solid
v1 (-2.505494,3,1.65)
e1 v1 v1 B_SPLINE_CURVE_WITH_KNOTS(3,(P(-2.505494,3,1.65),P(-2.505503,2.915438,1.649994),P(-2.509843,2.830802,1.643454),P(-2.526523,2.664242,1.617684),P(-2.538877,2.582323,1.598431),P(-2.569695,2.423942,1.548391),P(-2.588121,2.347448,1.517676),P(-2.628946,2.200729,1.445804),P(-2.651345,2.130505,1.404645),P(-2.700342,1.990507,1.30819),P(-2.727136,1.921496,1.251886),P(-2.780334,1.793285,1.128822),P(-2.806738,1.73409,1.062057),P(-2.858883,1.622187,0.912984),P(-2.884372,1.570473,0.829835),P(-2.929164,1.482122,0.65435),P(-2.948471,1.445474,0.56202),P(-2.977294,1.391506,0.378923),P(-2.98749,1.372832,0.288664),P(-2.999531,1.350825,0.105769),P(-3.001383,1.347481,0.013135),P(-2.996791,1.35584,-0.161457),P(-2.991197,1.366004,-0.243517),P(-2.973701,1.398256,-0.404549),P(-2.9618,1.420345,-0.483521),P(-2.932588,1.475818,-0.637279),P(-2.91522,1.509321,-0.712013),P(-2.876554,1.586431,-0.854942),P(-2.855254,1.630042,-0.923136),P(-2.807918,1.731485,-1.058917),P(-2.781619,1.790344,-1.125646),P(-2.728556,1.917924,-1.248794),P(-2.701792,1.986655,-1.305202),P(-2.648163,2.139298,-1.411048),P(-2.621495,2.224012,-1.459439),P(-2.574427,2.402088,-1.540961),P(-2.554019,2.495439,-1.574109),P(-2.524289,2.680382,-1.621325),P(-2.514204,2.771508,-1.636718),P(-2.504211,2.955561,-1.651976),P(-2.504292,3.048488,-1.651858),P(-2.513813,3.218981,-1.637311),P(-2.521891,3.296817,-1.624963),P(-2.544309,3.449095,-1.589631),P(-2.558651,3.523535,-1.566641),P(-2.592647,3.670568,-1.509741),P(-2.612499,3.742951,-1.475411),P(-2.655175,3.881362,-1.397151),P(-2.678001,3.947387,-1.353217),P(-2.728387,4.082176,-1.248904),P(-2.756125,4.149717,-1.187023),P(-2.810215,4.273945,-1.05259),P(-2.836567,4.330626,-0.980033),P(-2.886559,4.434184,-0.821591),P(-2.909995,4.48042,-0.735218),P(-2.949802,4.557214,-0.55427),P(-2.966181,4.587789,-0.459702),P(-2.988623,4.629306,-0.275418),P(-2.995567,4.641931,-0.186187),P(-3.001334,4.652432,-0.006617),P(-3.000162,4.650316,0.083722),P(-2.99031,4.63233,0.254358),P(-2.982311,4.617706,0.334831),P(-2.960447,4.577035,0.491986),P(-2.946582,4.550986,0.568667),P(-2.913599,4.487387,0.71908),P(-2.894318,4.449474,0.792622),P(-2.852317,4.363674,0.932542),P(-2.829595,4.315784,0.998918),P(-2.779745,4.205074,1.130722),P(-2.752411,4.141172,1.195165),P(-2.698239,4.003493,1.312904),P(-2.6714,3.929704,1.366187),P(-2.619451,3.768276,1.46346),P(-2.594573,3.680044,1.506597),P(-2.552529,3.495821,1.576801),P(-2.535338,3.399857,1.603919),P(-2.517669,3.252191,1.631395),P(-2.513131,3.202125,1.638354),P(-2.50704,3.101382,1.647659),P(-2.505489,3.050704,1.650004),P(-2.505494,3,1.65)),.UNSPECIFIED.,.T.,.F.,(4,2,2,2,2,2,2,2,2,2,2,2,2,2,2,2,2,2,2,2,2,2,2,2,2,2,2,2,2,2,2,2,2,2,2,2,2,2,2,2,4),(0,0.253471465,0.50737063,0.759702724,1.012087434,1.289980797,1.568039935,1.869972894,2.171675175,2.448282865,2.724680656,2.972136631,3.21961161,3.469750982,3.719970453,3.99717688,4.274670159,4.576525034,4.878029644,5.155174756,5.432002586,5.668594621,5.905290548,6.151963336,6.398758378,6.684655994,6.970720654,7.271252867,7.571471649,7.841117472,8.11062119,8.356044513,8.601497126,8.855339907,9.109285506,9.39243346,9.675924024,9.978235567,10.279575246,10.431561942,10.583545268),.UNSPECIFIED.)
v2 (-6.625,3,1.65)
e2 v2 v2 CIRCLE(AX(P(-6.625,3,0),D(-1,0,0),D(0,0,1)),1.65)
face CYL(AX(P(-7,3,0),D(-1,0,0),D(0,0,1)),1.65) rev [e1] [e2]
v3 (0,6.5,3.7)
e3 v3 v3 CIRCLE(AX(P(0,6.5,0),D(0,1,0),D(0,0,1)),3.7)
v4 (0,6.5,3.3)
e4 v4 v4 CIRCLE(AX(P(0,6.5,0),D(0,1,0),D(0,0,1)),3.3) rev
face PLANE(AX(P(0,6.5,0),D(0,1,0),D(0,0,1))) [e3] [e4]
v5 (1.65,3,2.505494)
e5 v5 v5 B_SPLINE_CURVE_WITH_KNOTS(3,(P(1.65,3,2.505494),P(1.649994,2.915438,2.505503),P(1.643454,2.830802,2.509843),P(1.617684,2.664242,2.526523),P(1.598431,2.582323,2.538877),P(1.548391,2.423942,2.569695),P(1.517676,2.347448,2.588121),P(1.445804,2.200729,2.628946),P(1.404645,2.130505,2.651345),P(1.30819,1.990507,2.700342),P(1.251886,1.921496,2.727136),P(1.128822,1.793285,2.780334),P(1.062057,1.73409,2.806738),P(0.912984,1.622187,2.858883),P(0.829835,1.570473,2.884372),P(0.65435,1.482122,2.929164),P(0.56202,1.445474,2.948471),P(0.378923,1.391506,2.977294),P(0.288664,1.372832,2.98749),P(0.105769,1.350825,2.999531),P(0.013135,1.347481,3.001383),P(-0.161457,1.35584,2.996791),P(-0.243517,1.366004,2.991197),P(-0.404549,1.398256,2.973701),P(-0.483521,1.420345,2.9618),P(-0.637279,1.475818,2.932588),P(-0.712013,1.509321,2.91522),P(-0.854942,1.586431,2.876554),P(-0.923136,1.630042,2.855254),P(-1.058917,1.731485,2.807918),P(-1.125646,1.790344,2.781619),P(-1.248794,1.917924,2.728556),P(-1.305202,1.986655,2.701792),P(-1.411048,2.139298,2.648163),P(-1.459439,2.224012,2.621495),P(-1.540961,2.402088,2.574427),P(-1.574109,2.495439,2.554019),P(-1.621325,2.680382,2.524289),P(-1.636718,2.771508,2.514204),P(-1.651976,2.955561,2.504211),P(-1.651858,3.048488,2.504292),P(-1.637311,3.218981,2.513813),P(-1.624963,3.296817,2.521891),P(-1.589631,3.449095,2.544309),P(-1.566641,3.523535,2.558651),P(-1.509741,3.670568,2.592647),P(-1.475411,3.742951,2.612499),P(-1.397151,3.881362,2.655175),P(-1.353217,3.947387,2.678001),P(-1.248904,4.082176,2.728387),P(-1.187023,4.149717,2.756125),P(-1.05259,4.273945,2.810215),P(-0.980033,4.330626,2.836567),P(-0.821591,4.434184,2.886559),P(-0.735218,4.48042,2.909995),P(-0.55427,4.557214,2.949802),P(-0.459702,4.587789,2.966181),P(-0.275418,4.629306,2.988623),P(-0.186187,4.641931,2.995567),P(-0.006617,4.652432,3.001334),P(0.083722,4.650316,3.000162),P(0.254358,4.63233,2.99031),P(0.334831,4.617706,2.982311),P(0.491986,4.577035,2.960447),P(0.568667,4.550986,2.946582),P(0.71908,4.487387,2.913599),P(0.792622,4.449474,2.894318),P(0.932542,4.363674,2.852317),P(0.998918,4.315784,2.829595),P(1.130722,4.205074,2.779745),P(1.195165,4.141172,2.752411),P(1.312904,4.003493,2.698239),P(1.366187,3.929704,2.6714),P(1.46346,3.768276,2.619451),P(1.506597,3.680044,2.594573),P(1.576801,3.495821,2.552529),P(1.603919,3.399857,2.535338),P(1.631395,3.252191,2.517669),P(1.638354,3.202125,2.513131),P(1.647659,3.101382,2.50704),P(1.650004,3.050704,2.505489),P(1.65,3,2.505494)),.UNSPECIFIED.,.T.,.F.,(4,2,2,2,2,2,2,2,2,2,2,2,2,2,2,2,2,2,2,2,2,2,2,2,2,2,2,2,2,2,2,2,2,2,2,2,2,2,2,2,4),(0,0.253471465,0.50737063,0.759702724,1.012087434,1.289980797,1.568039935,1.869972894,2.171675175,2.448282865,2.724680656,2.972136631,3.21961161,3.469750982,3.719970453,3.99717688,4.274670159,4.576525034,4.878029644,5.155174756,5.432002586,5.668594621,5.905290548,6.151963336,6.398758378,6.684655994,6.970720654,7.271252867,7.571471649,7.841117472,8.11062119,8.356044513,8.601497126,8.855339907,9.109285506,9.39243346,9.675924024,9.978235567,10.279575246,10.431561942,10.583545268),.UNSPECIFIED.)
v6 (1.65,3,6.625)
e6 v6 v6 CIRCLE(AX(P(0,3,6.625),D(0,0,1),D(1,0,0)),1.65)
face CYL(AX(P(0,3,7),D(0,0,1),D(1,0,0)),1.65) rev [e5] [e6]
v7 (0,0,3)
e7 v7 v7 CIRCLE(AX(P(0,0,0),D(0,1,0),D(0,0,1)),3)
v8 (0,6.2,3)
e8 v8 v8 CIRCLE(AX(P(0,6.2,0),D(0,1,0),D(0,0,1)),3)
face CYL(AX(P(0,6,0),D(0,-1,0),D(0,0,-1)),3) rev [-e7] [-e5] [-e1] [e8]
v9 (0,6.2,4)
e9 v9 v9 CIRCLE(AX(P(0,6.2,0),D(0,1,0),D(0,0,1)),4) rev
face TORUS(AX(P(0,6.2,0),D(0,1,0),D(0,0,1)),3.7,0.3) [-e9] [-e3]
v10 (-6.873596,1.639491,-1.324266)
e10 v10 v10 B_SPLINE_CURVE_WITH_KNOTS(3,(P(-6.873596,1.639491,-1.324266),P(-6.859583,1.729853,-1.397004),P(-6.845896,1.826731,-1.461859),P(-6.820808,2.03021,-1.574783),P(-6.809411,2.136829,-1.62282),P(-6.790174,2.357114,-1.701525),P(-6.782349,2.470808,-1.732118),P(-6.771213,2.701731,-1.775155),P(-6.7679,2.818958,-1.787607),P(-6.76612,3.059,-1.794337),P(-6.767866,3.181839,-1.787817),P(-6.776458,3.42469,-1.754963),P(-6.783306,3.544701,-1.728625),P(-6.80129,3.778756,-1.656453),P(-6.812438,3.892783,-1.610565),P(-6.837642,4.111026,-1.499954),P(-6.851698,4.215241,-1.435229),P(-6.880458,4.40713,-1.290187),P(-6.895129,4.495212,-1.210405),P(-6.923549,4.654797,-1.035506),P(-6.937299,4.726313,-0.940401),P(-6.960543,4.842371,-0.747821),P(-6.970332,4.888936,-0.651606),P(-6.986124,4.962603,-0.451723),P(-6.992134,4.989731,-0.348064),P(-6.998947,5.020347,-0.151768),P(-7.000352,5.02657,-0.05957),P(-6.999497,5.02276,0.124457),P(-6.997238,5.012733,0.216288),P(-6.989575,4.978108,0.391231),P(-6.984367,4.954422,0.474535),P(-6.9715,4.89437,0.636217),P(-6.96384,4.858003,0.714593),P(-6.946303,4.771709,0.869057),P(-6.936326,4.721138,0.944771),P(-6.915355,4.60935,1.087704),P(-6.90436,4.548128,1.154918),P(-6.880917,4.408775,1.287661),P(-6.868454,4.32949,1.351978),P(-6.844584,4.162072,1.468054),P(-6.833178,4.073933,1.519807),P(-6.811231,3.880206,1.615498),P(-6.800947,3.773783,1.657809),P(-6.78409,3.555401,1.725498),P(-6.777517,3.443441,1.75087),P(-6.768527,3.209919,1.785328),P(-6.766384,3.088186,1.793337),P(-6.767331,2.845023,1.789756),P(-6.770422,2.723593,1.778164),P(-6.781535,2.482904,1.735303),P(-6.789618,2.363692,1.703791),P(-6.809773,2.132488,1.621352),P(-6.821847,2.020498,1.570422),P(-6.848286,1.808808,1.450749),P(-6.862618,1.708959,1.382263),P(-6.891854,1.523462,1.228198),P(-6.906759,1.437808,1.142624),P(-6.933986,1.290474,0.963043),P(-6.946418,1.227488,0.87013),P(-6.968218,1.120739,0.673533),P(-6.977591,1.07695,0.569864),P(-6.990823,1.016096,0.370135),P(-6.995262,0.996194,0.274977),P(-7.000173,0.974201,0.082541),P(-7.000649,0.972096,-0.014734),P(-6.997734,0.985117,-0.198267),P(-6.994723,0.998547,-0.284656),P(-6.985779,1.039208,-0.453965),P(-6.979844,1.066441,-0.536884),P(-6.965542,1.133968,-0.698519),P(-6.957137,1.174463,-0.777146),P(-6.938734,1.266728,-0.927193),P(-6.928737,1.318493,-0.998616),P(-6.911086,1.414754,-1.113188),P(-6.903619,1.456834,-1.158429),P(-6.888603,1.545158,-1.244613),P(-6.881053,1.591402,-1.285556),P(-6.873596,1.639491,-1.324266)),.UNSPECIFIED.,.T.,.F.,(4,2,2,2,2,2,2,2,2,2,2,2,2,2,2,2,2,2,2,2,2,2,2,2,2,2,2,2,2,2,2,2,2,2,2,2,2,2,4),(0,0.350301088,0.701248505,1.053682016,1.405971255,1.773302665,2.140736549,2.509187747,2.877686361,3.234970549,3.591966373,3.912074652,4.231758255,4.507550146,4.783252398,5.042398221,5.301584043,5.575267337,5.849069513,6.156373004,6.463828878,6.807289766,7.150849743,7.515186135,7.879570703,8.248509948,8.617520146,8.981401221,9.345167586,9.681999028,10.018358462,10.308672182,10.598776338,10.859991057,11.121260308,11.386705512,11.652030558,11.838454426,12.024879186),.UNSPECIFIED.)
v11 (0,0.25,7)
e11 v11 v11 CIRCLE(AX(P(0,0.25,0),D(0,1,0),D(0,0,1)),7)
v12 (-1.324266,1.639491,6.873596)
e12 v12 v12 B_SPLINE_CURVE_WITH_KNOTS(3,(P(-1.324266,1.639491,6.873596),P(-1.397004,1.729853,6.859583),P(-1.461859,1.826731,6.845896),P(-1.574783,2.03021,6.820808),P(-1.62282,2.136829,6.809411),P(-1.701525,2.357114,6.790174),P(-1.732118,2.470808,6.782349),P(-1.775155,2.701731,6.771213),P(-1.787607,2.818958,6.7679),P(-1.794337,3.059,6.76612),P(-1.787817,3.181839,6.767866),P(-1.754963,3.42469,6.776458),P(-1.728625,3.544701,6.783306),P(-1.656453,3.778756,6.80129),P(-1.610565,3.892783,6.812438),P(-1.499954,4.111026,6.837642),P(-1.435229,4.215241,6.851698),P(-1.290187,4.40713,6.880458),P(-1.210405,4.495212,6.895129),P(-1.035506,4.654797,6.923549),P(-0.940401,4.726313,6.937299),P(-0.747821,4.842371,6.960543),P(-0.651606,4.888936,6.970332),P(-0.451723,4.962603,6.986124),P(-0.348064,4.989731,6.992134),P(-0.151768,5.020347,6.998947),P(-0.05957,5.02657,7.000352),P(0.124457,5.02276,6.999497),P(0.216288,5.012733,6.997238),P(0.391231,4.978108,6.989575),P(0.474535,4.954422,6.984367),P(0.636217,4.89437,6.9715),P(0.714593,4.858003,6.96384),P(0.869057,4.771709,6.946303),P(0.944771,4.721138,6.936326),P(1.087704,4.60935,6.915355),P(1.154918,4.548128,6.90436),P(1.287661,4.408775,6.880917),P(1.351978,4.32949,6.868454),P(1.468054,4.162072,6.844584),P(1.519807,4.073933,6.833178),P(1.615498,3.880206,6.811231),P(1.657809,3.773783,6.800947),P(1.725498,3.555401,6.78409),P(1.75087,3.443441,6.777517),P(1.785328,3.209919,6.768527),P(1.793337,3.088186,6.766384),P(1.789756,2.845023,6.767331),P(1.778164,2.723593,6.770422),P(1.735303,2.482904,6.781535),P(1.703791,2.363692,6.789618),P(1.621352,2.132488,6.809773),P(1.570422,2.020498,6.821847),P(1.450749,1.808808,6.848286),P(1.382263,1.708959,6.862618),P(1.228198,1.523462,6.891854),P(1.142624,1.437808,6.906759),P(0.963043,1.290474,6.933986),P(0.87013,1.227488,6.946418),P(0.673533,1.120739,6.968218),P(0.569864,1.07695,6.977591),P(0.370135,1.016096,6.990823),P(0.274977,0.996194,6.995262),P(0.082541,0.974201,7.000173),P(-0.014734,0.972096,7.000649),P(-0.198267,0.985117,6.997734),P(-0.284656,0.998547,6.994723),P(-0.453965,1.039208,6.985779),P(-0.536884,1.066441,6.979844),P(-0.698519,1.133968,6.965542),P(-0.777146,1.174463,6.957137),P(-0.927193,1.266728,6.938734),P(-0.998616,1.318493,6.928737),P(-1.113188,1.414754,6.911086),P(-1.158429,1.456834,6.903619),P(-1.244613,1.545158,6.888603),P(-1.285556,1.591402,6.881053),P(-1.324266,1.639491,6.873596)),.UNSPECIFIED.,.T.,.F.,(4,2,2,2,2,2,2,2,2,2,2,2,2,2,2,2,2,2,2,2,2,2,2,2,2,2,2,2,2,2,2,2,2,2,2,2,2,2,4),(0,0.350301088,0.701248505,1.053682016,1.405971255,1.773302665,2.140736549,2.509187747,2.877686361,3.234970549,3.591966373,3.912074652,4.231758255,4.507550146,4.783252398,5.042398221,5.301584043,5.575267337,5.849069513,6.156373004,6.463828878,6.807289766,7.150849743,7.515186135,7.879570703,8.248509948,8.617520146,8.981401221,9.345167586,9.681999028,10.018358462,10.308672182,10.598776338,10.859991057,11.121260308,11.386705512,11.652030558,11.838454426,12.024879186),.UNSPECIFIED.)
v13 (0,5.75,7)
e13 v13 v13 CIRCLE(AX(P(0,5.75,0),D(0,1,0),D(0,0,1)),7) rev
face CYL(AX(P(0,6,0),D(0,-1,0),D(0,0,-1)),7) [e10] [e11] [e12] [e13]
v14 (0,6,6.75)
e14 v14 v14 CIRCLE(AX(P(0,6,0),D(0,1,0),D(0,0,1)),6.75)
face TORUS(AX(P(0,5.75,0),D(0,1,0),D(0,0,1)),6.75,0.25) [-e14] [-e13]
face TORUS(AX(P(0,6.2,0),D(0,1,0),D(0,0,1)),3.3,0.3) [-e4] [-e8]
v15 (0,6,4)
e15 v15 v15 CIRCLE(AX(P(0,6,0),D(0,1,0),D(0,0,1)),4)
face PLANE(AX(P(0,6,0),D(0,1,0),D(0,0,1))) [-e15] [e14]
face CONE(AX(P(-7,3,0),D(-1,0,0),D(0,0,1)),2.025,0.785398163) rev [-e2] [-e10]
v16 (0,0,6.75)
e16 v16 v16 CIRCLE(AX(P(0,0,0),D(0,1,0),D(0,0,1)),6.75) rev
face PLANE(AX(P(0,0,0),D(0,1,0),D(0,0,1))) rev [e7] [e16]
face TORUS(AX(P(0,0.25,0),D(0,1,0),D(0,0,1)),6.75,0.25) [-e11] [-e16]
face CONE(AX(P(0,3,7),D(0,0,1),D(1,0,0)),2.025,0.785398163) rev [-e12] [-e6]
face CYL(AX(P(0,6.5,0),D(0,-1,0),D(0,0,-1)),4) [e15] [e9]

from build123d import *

# Parameters (mm, degrees)
SKETCH1_R           = 7
SKETCH1_R_2         = 3
BOSS_EXTRUDE1_DEPTH = 6
SKETCH2_R           = 4
SKETCH2_R_2         = 3
BOSS_EXTRUDE2_DEPTH = 0.5
FILLET1_R           = 0.3
FILLET2_R           = 0.25
CIRPATTERN1_COUNT   = 2
CIRPATTERN1_ANGLE   = 90


# Read off the part's stored shape, not the designer's step: M4 Tapped Hole1
with BuildPart() as part:
    # Sketch1 → Boss-Extrude1 (new body)
    with BuildSketch(Plane(origin=(0, 0, 0), x_dir=(1, 0, 0), z_dir=(0, 1, 0))):
        with Locations(Location((0, 0, 0), (0, 0, 270))):
            Circle(SKETCH1_R)
        with Locations(Location((0, 0, 0), (0, 0, 270))):
            Circle(SKETCH1_R_2, mode=Mode.SUBTRACT)
    extrude(amount=BOSS_EXTRUDE1_DEPTH)

    # Sketch2 → Boss-Extrude2 (add)
    with BuildSketch(Plane(origin=(0, 6, 0), x_dir=(1, 0, 0), z_dir=(0, 1, 0))):
        with Locations(Location((0, 0, 0), (0, 0, 270))):
            Circle(SKETCH2_R)
        with Locations(Location((0, 0, 0), (0, 0, 270))):
            Circle(SKETCH2_R_2, mode=Mode.SUBTRACT)
    extrude(amount=BOSS_EXTRUDE2_DEPTH)

    # Fillet1
    fillet1_edges = [part.edges().sort_by_distance(p)[0] for p in [
        (0, 6.5, -4),
        (0, 6.5, -3),
    ]]
    fillet(fillet1_edges, radius=FILLET1_R)

    # Fillet2
    fillet2_edges = [part.edges().sort_by_distance(p)[0] for p in [
        (0, 0, -7),
        (0, 6, -7),
    ]]
    fillet(fillet2_edges, radius=FILLET2_R)

    # M4 Tapped Hole1 outline → M4 Tapped Hole1 (revolve, cut)
    with BuildSketch(Plane.XZ.offset(-3)):
        Polygon((2.025001015, 7.000001015), (0, 7.000001015), (0, 2.505277626), (1.65, 2.505277626), (1.65, 6.625), align=None)
    m4_tapped_hole1 = revolve(axis=Axis((0, 3, 0), (0, 0, 1)), mode=Mode.SUBTRACT)

    # CirPattern1: M4 Tapped Hole1 ×2 about axis
    cirpattern1_axis = Axis((0, 6, 0), (0, -1, 0))
    for i in range(1, CIRPATTERN1_COUNT):
        add(m4_tapped_hole1.rotate(cirpattern1_axis, i * CIRPATTERN1_ANGLE / (CIRPATTERN1_COUNT - 1)), mode=Mode.SUBTRACT)


solid = part.part
